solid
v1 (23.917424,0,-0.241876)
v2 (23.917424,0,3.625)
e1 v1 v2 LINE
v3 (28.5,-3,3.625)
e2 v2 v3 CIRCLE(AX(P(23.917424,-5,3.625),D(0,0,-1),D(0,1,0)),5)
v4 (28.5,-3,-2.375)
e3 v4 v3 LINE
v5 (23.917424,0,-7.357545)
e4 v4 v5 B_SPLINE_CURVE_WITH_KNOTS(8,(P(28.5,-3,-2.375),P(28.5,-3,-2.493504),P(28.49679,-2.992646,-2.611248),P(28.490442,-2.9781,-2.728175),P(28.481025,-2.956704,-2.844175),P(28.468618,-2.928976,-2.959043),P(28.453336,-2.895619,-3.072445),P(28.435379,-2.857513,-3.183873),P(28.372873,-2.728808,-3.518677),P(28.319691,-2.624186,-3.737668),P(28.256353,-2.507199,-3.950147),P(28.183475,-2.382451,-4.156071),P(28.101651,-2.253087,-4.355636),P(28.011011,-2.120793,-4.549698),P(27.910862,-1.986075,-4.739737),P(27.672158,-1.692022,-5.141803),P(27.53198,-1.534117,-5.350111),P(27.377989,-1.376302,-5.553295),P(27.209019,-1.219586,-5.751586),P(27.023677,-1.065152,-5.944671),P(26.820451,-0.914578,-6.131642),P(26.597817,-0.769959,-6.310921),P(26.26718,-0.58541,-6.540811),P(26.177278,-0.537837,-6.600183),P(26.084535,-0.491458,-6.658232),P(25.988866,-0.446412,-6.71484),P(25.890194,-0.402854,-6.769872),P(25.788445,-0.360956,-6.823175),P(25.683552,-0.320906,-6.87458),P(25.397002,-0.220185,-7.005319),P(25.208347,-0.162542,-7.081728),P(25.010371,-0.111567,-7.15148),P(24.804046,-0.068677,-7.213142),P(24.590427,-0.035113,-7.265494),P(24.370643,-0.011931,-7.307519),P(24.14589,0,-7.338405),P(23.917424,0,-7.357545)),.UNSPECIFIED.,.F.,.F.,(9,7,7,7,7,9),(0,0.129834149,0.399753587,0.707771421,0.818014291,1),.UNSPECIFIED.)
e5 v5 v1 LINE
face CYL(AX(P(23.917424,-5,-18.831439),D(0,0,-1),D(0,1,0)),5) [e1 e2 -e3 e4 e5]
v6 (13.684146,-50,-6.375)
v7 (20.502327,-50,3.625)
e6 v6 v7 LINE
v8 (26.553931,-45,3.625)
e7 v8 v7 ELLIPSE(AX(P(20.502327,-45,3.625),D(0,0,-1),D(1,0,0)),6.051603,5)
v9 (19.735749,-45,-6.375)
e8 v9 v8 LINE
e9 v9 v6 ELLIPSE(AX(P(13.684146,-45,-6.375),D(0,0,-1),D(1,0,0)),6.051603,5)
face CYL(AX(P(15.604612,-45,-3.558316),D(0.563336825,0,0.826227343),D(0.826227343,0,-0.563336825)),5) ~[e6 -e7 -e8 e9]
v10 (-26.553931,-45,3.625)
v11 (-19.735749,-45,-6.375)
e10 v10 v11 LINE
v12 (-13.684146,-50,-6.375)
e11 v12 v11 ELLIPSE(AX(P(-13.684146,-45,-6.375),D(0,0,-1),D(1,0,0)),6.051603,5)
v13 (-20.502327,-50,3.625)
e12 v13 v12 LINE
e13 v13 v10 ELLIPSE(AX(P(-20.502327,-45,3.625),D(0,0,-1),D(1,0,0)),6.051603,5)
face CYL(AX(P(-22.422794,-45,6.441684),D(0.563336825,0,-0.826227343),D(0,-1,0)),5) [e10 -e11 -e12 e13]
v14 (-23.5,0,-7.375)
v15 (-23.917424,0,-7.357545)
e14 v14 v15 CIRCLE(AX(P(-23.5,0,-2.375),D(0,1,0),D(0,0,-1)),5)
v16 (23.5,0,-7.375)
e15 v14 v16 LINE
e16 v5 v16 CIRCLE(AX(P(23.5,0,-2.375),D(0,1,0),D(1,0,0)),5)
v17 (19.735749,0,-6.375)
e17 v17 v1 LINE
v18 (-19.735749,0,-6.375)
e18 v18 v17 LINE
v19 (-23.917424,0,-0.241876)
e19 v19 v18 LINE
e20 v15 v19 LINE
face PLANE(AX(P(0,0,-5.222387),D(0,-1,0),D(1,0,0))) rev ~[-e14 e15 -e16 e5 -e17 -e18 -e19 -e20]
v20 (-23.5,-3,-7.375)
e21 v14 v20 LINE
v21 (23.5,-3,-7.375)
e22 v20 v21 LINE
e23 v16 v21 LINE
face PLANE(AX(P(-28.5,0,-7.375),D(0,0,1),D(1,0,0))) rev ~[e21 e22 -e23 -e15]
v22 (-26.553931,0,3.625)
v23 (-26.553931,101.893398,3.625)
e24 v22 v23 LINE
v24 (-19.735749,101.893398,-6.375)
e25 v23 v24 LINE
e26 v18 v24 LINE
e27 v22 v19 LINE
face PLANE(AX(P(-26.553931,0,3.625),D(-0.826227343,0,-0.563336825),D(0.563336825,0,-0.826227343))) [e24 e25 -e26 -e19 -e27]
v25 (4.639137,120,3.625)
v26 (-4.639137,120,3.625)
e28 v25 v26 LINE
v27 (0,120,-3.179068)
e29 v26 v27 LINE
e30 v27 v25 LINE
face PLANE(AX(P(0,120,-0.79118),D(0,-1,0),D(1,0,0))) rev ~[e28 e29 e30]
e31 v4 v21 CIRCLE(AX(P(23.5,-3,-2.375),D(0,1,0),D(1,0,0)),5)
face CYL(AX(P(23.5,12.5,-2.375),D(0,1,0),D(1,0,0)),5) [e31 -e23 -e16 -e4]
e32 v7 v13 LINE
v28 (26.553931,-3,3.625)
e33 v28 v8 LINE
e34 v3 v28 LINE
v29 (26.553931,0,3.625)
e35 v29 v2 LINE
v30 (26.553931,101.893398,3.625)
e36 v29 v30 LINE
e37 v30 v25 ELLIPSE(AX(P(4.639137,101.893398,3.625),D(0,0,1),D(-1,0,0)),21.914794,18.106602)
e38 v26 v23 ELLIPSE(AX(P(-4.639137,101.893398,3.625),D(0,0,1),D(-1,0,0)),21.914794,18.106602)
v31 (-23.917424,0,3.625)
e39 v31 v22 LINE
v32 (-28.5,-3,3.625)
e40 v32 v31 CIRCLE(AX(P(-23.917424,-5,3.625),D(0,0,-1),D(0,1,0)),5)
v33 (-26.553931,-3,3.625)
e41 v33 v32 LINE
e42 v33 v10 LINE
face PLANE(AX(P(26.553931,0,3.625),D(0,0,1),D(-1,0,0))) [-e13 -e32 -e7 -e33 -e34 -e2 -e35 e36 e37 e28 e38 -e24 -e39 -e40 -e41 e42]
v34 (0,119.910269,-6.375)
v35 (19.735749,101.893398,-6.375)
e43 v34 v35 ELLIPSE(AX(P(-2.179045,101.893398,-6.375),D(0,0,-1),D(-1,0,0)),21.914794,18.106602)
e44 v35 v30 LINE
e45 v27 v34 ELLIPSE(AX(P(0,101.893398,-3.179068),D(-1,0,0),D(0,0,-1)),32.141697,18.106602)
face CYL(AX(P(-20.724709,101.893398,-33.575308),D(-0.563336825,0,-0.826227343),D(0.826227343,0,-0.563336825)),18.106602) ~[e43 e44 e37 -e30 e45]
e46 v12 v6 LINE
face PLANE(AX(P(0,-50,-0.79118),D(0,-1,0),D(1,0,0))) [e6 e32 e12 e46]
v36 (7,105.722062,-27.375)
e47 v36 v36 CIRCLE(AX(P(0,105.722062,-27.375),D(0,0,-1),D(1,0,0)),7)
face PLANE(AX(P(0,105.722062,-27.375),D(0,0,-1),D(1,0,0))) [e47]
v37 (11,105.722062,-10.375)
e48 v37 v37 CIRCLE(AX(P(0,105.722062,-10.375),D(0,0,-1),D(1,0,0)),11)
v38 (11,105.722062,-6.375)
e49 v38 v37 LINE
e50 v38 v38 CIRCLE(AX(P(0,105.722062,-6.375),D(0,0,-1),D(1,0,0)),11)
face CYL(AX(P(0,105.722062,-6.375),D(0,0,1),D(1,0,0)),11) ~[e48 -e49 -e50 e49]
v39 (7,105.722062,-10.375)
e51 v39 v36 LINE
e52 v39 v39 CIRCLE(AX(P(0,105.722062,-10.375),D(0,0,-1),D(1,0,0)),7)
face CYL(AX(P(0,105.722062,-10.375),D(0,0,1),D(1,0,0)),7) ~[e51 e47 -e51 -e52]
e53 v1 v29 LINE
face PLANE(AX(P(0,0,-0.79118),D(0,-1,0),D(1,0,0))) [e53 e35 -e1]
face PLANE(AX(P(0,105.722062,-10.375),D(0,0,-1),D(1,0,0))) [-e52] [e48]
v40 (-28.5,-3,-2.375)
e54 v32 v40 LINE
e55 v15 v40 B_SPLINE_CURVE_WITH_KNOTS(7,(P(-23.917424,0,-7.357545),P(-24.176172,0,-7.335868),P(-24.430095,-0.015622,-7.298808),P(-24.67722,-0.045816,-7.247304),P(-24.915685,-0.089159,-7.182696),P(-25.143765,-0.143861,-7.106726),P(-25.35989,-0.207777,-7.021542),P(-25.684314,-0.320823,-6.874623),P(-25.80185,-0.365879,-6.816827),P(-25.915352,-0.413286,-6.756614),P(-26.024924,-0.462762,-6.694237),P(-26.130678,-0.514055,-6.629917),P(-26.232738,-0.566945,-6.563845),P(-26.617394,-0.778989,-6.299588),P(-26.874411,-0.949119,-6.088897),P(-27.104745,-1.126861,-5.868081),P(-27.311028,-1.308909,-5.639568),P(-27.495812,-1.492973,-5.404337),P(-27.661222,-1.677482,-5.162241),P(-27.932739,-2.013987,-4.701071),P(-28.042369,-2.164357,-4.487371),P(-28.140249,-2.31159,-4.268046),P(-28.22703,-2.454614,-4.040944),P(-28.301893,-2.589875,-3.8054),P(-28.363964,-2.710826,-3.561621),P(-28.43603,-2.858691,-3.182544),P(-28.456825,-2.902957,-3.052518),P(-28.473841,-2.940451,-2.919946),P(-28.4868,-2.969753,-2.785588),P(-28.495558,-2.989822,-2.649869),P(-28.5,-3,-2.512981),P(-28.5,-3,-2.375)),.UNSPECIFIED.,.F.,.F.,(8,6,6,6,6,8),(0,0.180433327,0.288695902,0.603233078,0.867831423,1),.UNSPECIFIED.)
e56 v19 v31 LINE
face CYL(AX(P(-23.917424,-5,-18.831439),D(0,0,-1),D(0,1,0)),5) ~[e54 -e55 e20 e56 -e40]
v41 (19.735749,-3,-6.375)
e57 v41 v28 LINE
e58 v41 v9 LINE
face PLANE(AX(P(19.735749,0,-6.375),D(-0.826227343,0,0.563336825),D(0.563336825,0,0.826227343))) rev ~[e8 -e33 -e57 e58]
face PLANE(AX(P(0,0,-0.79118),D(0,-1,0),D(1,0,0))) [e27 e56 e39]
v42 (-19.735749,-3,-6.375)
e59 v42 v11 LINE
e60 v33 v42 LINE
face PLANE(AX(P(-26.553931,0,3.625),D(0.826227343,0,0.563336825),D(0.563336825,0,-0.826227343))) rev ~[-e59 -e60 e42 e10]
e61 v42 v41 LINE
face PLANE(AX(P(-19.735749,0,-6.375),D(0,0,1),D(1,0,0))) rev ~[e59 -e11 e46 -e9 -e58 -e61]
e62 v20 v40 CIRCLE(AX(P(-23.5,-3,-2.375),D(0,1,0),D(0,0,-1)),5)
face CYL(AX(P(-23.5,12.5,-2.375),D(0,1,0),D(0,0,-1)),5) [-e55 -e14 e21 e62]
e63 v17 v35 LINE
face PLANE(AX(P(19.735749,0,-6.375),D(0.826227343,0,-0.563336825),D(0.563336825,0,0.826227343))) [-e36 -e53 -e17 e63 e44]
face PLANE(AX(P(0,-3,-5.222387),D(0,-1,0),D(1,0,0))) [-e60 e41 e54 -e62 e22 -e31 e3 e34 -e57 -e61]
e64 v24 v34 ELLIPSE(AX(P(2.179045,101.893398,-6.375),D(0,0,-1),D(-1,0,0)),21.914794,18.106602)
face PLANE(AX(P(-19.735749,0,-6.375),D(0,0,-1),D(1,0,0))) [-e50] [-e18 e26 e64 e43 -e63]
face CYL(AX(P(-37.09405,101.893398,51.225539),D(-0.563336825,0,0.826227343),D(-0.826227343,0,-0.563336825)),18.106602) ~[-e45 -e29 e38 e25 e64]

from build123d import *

# Parameters (mm, degrees)
F1_DEPTH    = 50
F2_DEPTH    = 3
F3_T1_DEPTH = 28
F3_T3_DEPTH = 33.9128784748
F4_DEPTH    = 120
F5_T1_DEPTH = 102.6362149123
F5_T3_DEPTH = 102.6362149123
F6_R        = 11
F7_DEPTH    = 4
F8_R        = 7
F9_DEPTH    = 17
F10_R       = 5


# Not quite as in the source:
# - a fillet or chamfer that OpenCascade refuses, or shapes differently, is made with other operations: its cross-section is extruded or revolved along the edge and cut away or added


with BuildPart() as f1:
    # F0 (on Front) → F1 (new body)
    with BuildSketch(Plane.XZ):
        Polygon((26.5539305929, 3.625), (-26.5539305929, 3.625), (-19.7357487747, -6.375), (19.7357487747, -6.375), align=None)
    extrude(amount=F1_DEPTH)

    # F0 (on Front) → F2 (join)
    with BuildSketch(Plane.XZ):
        Polygon((20, -6.875), (-20, -6.875), (-27.1590909091, 3.625), (-27.5, 3.625), (-28.5, 3.625), (-28.5, -7.375), (28.5, -7.375), (28.5, 3.625), (27.5, 3.625), (27.1590909091, 3.625), align=None)
        Polygon((26.5539305929, 3.625), (-26.5539305929, 3.625), (-19.7357487747, -6.375), (19.7357487747, -6.375), align=None)
        Polygon((-27.1590909091, 3.625), (-20, -6.875), (20, -6.875), (27.1590909091, 3.625), (26.5539305929, 3.625), (19.7357487747, -6.375), (-19.7357487747, -6.375), (-26.5539305929, 3.625), align=None)
    extrude(amount=F2_DEPTH)

    # F3: fillet of radius 5 on 4 edges, made by hand

    # F3_s2 → F3_t1 (cut)
    with BuildSketch(Plane.XZ.offset(-12.5)):
        with BuildLine():
            ThreePointArc((28.5, -2.375), (27.0355339059, -5.9105339059), (23.5, -7.375))
            Line((23.5, -7.375), (28.5, -7.375))
            Line((28.5, -7.375), (28.5, -2.375))
        make_face()
        with BuildLine():
            ThreePointArc((-23.5, -7.375), (-27.0355339059, -5.9105339059), (-28.5, -2.375))
            Line((-28.5, -2.375), (-28.5, -7.375))
            Line((-28.5, -7.375), (-23.5, -7.375))
        make_face()
    extrude(amount=F3_T1_DEPTH, mode=Mode.SUBTRACT)

    # F3_s4 → F3_t3 (cut)
    with BuildSketch(Plane.XY.offset(-18.8314392374)):
        with BuildLine():
            ThreePointArc((23.917424305, 0), (26.6560370926, -0.8166998673), (28.5, -3))
            Line((28.5, -3), (28.5, 0))
            Line((28.5, 0), (23.917424305, 0))
        make_face()
        with BuildLine():
            ThreePointArc((-23.917424305, 0), (-26.6560370926, -0.8166998673), (-28.5, -3))
            Line((-28.5, -3), (-28.5, 0))
            Line((-28.5, 0), (-23.917424305, 0))
        make_face()
    extrude(amount=F3_T3_DEPTH, mode=Mode.SUBTRACT)

    # F0 (on Front) → F4 (join)
    with BuildSketch(Plane.XZ):
        Polygon((26.5539305929, 3.625), (-26.5539305929, 3.625), (-19.7357487747, -6.375), (19.7357487747, -6.375), align=None)
    extrude(amount=-F4_DEPTH)

    # F5: fillet of radius 18.1066017178 on 2 edges, made by hand

    # F5_s2 → F5_t1 (cut)
    with BuildSketch(Plane(origin=(-22.2043882639, 0, -32.5664361204), x_dir=(0, 1, 0), z_dir=(0.5633368246, 0, 0.8262273428))):
        with BuildLine():
            ThreePointArc((101.8933982822, -19.8974875256), (114.6966991411, -14.5941866667), (120, -1.7908858078))
            Line((120, -1.7908858078), (120, -19.8974875256))
            Line((120, -19.8974875256), (101.8933982822, -19.8974875256))
        make_face()
    extrude(amount=F5_T1_DEPTH, mode=Mode.SUBTRACT)

    # F5_s4 → F5_t3 (cut)
    with BuildSketch(Plane(origin=(-35.614371138, 0, 52.2344110024), x_dir=(0, 1, 0), z_dir=(0.5633368246, 0, -0.8262273428))):
        with BuildLine():
            ThreePointArc((101.8933982822, -19.8974875256), (114.6966991411, -14.5941866667), (120, -1.7908858078))
            Line((120, -1.7908858078), (120, -19.8974875256))
            Line((120, -19.8974875256), (101.8933982822, -19.8974875256))
        make_face()
    extrude(amount=F5_T3_DEPTH, mode=Mode.SUBTRACT)

    # F6 (on face) → F7 (join)
    with BuildSketch(Plane(origin=(0, 0, -6.375), x_dir=(1, 0, 0), z_dir=(0, 0, -1))):
        with Locations((0, -105.7220622897)):
            Circle(F6_R)
    extrude(amount=F7_DEPTH)

    # F8 (on face) → F9 (join)
    with BuildSketch(Plane(origin=(0, 0, -10.375), x_dir=(1, 0, 0), z_dir=(0, 0, -1))):
        with Locations((0, -105.7220622897)):
            Circle(F8_R)
    extrude(amount=F9_DEPTH)

    # F10
    f10_edges = [f1.edges().sort_by_distance(p)[0] for p in [
        (23.14484, -50, -1.375),
        (-23.14484, -50, -1.375),
    ]]
    fillet(f10_edges, radius=F10_R)


solid = f1.part
